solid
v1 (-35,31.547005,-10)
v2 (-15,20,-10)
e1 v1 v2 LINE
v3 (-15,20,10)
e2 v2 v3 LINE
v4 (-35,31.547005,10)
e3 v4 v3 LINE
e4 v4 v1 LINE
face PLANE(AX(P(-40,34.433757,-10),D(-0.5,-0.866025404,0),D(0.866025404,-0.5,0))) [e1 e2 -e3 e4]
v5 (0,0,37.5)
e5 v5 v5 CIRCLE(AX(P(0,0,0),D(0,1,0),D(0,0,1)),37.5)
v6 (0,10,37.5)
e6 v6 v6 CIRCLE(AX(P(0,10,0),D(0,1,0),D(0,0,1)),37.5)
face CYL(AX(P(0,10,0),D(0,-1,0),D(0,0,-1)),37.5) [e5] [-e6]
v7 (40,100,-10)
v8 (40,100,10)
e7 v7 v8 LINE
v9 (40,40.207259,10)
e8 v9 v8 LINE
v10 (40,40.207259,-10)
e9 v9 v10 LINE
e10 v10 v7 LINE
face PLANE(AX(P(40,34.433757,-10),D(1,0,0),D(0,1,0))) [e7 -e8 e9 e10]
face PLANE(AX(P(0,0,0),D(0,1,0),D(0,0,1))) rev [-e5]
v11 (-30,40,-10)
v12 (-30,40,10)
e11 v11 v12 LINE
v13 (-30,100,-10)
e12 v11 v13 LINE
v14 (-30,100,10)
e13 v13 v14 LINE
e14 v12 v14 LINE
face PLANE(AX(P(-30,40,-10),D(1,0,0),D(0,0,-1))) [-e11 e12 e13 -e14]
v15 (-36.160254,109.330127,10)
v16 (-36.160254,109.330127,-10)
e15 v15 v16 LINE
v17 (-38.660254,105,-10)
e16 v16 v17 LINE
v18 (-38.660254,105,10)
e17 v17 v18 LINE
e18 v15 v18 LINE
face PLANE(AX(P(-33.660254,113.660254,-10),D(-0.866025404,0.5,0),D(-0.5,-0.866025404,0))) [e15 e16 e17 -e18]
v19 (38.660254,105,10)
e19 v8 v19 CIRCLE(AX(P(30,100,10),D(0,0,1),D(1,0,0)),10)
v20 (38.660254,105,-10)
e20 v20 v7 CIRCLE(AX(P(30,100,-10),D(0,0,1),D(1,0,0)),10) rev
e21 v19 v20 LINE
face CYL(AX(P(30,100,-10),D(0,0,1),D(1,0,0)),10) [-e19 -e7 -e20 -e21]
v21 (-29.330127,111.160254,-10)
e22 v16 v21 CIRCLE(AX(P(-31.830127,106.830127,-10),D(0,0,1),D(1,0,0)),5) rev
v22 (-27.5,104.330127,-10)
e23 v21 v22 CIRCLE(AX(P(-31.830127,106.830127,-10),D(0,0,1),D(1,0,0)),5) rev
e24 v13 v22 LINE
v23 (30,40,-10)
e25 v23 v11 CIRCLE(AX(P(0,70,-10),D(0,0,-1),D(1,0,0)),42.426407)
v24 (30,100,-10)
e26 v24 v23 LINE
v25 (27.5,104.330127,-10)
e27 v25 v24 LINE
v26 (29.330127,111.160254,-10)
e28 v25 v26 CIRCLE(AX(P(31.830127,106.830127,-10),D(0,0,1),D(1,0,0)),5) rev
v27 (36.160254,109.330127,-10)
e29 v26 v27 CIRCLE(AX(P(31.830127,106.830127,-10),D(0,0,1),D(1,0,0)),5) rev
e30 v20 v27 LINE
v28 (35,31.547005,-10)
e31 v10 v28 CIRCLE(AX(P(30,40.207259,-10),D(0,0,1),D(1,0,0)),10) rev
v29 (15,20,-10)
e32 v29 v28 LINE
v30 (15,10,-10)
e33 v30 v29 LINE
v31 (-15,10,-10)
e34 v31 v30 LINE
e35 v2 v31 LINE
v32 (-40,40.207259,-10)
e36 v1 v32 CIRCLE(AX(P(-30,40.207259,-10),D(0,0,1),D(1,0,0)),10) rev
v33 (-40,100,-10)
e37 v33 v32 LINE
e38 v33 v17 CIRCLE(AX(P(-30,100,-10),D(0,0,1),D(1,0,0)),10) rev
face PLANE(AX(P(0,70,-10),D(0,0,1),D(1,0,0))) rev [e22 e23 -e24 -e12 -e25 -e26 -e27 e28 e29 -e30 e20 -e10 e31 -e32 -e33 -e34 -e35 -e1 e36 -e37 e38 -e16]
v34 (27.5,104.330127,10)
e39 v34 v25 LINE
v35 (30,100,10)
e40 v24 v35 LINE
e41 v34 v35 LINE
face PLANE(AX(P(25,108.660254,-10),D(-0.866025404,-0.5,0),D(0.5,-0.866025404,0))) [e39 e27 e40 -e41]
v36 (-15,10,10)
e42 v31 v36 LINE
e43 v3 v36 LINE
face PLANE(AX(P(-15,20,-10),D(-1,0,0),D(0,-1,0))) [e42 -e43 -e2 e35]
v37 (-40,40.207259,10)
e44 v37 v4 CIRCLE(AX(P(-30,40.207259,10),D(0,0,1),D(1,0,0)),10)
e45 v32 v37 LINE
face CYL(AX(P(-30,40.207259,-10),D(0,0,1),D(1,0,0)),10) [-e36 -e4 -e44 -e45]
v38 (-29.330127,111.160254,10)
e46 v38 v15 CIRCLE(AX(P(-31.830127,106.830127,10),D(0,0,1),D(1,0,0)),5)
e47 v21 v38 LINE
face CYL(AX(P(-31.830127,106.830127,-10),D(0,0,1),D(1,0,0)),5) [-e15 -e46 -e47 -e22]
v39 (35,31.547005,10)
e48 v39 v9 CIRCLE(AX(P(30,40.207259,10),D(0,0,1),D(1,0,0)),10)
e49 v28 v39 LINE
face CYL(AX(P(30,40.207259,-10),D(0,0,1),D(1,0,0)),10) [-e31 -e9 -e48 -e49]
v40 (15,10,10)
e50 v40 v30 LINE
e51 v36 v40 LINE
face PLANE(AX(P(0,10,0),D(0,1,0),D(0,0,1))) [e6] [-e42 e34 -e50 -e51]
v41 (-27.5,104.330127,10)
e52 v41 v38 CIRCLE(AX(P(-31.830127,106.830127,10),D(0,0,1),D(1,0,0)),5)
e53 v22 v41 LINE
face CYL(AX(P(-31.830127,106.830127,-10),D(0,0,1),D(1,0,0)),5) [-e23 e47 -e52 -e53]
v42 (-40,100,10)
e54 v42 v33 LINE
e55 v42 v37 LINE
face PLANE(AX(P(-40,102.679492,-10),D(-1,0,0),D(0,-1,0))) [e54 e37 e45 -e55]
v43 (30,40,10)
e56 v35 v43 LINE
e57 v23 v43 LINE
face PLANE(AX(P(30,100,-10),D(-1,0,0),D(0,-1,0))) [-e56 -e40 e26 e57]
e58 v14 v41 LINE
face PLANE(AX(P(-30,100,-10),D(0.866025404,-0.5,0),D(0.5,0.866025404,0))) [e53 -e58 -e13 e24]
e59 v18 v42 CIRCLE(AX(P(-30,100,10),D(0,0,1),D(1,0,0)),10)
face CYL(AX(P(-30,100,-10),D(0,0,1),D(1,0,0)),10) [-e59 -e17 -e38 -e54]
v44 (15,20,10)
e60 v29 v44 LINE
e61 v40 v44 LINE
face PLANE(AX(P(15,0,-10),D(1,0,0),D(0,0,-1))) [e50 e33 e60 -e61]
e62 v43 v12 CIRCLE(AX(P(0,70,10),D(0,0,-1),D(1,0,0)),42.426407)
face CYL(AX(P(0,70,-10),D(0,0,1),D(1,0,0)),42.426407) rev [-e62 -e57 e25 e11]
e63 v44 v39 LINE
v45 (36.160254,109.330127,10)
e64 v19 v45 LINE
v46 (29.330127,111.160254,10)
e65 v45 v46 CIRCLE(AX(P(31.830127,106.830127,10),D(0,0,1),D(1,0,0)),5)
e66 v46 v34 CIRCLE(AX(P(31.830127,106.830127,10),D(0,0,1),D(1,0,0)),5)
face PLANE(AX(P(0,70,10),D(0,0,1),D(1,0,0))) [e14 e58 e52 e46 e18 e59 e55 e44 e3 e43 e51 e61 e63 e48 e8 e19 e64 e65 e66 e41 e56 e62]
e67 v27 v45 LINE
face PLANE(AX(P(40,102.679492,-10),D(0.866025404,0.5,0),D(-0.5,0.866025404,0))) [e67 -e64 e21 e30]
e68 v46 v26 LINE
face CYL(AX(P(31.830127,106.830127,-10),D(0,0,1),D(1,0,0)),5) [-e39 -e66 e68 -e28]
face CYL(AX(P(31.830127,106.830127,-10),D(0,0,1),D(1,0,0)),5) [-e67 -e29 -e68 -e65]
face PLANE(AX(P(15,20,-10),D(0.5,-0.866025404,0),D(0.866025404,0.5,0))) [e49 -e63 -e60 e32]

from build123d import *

# Parameters (mm, degrees)
SKETCH_1_R           = 37.5
EXTRUDE_1_DEPTH      = 10
EXTRUDE_2_DEPTH      = 10
EXTRUDE_2_DEPTH_BACK = 10
FILLET_1_R           = 5
FILLET_2_R           = 10


with BuildPart() as part:
    # 草图1 → 凸台-拉伸1 (new body)
    with BuildSketch(Plane(origin=(0, 0, 0), x_dir=(1, 0, 0), z_dir=(0, 1, 0))):
        with Locations(Location((0, 0, 0), (0, 0, 270))):
            Circle(SKETCH_1_R)
    extrude(amount=EXTRUDE_1_DEPTH)

    # 草图2 → 凸台-拉伸2 (add, two sides: drawn at the far end of the back side and taken through both)
    with BuildSketch(Plane.XY.offset(-EXTRUDE_2_DEPTH_BACK)):
        with BuildLine():
            Line((15, 0), (15, 20))
            Line((15, 20), (40, 34.43375673))
            Line((40, 34.43375673), (40, 102.679491924))
            Line((40, 102.679491924), (33.660254038, 113.660254038))
            Line((33.660254038, 113.660254038), (25, 108.660254038))
            Line((25, 108.660254038), (30, 100))
            Line((30, 100), (30, 40))
            ThreePointArc((30, 40), (0, 27.573593129), (-30, 40))
            Line((-30, 40), (-30, 100))
            Line((-30, 100), (-25, 108.660254038))
            Line((-25, 108.660254038), (-33.660254038, 113.660254038))
            Line((-33.660254038, 113.660254038), (-40, 102.679491924))
            Line((-40, 102.679491924), (-40, 34.43375673))
            Line((-40, 34.43375673), (-15, 20))
            Line((-15, 20), (-15, 0))
            Line((-15, 0), (15, 0))
        make_face()
    extrude(amount=EXTRUDE_2_DEPTH + EXTRUDE_2_DEPTH_BACK)

    # 圆角1
    fillet_1_edges = [part.edges().sort_by_distance(p)[0] for p in [
        (33.660254038, 113.660254038, 0),
        (25, 108.660254038, 0),
        (-25, 108.660254038, 0),
        (-33.660254038, 113.660254038, 0),
    ]]
    fillet(fillet_1_edges, radius=FILLET_1_R - 0.0001)  # a hair under: the kernel refuses the full size

    # 圆角2
    fillet_2_edges = [part.edges().sort_by_distance(p)[0] for p in [
        (-40, 34.43375673, 0),
        (-40, 102.679491924, 0),
        (40, 102.679491924, 0),
        (40, 34.43375673, 0),
    ]]
    fillet(fillet_2_edges, radius=FILLET_2_R)


solid = part.part
